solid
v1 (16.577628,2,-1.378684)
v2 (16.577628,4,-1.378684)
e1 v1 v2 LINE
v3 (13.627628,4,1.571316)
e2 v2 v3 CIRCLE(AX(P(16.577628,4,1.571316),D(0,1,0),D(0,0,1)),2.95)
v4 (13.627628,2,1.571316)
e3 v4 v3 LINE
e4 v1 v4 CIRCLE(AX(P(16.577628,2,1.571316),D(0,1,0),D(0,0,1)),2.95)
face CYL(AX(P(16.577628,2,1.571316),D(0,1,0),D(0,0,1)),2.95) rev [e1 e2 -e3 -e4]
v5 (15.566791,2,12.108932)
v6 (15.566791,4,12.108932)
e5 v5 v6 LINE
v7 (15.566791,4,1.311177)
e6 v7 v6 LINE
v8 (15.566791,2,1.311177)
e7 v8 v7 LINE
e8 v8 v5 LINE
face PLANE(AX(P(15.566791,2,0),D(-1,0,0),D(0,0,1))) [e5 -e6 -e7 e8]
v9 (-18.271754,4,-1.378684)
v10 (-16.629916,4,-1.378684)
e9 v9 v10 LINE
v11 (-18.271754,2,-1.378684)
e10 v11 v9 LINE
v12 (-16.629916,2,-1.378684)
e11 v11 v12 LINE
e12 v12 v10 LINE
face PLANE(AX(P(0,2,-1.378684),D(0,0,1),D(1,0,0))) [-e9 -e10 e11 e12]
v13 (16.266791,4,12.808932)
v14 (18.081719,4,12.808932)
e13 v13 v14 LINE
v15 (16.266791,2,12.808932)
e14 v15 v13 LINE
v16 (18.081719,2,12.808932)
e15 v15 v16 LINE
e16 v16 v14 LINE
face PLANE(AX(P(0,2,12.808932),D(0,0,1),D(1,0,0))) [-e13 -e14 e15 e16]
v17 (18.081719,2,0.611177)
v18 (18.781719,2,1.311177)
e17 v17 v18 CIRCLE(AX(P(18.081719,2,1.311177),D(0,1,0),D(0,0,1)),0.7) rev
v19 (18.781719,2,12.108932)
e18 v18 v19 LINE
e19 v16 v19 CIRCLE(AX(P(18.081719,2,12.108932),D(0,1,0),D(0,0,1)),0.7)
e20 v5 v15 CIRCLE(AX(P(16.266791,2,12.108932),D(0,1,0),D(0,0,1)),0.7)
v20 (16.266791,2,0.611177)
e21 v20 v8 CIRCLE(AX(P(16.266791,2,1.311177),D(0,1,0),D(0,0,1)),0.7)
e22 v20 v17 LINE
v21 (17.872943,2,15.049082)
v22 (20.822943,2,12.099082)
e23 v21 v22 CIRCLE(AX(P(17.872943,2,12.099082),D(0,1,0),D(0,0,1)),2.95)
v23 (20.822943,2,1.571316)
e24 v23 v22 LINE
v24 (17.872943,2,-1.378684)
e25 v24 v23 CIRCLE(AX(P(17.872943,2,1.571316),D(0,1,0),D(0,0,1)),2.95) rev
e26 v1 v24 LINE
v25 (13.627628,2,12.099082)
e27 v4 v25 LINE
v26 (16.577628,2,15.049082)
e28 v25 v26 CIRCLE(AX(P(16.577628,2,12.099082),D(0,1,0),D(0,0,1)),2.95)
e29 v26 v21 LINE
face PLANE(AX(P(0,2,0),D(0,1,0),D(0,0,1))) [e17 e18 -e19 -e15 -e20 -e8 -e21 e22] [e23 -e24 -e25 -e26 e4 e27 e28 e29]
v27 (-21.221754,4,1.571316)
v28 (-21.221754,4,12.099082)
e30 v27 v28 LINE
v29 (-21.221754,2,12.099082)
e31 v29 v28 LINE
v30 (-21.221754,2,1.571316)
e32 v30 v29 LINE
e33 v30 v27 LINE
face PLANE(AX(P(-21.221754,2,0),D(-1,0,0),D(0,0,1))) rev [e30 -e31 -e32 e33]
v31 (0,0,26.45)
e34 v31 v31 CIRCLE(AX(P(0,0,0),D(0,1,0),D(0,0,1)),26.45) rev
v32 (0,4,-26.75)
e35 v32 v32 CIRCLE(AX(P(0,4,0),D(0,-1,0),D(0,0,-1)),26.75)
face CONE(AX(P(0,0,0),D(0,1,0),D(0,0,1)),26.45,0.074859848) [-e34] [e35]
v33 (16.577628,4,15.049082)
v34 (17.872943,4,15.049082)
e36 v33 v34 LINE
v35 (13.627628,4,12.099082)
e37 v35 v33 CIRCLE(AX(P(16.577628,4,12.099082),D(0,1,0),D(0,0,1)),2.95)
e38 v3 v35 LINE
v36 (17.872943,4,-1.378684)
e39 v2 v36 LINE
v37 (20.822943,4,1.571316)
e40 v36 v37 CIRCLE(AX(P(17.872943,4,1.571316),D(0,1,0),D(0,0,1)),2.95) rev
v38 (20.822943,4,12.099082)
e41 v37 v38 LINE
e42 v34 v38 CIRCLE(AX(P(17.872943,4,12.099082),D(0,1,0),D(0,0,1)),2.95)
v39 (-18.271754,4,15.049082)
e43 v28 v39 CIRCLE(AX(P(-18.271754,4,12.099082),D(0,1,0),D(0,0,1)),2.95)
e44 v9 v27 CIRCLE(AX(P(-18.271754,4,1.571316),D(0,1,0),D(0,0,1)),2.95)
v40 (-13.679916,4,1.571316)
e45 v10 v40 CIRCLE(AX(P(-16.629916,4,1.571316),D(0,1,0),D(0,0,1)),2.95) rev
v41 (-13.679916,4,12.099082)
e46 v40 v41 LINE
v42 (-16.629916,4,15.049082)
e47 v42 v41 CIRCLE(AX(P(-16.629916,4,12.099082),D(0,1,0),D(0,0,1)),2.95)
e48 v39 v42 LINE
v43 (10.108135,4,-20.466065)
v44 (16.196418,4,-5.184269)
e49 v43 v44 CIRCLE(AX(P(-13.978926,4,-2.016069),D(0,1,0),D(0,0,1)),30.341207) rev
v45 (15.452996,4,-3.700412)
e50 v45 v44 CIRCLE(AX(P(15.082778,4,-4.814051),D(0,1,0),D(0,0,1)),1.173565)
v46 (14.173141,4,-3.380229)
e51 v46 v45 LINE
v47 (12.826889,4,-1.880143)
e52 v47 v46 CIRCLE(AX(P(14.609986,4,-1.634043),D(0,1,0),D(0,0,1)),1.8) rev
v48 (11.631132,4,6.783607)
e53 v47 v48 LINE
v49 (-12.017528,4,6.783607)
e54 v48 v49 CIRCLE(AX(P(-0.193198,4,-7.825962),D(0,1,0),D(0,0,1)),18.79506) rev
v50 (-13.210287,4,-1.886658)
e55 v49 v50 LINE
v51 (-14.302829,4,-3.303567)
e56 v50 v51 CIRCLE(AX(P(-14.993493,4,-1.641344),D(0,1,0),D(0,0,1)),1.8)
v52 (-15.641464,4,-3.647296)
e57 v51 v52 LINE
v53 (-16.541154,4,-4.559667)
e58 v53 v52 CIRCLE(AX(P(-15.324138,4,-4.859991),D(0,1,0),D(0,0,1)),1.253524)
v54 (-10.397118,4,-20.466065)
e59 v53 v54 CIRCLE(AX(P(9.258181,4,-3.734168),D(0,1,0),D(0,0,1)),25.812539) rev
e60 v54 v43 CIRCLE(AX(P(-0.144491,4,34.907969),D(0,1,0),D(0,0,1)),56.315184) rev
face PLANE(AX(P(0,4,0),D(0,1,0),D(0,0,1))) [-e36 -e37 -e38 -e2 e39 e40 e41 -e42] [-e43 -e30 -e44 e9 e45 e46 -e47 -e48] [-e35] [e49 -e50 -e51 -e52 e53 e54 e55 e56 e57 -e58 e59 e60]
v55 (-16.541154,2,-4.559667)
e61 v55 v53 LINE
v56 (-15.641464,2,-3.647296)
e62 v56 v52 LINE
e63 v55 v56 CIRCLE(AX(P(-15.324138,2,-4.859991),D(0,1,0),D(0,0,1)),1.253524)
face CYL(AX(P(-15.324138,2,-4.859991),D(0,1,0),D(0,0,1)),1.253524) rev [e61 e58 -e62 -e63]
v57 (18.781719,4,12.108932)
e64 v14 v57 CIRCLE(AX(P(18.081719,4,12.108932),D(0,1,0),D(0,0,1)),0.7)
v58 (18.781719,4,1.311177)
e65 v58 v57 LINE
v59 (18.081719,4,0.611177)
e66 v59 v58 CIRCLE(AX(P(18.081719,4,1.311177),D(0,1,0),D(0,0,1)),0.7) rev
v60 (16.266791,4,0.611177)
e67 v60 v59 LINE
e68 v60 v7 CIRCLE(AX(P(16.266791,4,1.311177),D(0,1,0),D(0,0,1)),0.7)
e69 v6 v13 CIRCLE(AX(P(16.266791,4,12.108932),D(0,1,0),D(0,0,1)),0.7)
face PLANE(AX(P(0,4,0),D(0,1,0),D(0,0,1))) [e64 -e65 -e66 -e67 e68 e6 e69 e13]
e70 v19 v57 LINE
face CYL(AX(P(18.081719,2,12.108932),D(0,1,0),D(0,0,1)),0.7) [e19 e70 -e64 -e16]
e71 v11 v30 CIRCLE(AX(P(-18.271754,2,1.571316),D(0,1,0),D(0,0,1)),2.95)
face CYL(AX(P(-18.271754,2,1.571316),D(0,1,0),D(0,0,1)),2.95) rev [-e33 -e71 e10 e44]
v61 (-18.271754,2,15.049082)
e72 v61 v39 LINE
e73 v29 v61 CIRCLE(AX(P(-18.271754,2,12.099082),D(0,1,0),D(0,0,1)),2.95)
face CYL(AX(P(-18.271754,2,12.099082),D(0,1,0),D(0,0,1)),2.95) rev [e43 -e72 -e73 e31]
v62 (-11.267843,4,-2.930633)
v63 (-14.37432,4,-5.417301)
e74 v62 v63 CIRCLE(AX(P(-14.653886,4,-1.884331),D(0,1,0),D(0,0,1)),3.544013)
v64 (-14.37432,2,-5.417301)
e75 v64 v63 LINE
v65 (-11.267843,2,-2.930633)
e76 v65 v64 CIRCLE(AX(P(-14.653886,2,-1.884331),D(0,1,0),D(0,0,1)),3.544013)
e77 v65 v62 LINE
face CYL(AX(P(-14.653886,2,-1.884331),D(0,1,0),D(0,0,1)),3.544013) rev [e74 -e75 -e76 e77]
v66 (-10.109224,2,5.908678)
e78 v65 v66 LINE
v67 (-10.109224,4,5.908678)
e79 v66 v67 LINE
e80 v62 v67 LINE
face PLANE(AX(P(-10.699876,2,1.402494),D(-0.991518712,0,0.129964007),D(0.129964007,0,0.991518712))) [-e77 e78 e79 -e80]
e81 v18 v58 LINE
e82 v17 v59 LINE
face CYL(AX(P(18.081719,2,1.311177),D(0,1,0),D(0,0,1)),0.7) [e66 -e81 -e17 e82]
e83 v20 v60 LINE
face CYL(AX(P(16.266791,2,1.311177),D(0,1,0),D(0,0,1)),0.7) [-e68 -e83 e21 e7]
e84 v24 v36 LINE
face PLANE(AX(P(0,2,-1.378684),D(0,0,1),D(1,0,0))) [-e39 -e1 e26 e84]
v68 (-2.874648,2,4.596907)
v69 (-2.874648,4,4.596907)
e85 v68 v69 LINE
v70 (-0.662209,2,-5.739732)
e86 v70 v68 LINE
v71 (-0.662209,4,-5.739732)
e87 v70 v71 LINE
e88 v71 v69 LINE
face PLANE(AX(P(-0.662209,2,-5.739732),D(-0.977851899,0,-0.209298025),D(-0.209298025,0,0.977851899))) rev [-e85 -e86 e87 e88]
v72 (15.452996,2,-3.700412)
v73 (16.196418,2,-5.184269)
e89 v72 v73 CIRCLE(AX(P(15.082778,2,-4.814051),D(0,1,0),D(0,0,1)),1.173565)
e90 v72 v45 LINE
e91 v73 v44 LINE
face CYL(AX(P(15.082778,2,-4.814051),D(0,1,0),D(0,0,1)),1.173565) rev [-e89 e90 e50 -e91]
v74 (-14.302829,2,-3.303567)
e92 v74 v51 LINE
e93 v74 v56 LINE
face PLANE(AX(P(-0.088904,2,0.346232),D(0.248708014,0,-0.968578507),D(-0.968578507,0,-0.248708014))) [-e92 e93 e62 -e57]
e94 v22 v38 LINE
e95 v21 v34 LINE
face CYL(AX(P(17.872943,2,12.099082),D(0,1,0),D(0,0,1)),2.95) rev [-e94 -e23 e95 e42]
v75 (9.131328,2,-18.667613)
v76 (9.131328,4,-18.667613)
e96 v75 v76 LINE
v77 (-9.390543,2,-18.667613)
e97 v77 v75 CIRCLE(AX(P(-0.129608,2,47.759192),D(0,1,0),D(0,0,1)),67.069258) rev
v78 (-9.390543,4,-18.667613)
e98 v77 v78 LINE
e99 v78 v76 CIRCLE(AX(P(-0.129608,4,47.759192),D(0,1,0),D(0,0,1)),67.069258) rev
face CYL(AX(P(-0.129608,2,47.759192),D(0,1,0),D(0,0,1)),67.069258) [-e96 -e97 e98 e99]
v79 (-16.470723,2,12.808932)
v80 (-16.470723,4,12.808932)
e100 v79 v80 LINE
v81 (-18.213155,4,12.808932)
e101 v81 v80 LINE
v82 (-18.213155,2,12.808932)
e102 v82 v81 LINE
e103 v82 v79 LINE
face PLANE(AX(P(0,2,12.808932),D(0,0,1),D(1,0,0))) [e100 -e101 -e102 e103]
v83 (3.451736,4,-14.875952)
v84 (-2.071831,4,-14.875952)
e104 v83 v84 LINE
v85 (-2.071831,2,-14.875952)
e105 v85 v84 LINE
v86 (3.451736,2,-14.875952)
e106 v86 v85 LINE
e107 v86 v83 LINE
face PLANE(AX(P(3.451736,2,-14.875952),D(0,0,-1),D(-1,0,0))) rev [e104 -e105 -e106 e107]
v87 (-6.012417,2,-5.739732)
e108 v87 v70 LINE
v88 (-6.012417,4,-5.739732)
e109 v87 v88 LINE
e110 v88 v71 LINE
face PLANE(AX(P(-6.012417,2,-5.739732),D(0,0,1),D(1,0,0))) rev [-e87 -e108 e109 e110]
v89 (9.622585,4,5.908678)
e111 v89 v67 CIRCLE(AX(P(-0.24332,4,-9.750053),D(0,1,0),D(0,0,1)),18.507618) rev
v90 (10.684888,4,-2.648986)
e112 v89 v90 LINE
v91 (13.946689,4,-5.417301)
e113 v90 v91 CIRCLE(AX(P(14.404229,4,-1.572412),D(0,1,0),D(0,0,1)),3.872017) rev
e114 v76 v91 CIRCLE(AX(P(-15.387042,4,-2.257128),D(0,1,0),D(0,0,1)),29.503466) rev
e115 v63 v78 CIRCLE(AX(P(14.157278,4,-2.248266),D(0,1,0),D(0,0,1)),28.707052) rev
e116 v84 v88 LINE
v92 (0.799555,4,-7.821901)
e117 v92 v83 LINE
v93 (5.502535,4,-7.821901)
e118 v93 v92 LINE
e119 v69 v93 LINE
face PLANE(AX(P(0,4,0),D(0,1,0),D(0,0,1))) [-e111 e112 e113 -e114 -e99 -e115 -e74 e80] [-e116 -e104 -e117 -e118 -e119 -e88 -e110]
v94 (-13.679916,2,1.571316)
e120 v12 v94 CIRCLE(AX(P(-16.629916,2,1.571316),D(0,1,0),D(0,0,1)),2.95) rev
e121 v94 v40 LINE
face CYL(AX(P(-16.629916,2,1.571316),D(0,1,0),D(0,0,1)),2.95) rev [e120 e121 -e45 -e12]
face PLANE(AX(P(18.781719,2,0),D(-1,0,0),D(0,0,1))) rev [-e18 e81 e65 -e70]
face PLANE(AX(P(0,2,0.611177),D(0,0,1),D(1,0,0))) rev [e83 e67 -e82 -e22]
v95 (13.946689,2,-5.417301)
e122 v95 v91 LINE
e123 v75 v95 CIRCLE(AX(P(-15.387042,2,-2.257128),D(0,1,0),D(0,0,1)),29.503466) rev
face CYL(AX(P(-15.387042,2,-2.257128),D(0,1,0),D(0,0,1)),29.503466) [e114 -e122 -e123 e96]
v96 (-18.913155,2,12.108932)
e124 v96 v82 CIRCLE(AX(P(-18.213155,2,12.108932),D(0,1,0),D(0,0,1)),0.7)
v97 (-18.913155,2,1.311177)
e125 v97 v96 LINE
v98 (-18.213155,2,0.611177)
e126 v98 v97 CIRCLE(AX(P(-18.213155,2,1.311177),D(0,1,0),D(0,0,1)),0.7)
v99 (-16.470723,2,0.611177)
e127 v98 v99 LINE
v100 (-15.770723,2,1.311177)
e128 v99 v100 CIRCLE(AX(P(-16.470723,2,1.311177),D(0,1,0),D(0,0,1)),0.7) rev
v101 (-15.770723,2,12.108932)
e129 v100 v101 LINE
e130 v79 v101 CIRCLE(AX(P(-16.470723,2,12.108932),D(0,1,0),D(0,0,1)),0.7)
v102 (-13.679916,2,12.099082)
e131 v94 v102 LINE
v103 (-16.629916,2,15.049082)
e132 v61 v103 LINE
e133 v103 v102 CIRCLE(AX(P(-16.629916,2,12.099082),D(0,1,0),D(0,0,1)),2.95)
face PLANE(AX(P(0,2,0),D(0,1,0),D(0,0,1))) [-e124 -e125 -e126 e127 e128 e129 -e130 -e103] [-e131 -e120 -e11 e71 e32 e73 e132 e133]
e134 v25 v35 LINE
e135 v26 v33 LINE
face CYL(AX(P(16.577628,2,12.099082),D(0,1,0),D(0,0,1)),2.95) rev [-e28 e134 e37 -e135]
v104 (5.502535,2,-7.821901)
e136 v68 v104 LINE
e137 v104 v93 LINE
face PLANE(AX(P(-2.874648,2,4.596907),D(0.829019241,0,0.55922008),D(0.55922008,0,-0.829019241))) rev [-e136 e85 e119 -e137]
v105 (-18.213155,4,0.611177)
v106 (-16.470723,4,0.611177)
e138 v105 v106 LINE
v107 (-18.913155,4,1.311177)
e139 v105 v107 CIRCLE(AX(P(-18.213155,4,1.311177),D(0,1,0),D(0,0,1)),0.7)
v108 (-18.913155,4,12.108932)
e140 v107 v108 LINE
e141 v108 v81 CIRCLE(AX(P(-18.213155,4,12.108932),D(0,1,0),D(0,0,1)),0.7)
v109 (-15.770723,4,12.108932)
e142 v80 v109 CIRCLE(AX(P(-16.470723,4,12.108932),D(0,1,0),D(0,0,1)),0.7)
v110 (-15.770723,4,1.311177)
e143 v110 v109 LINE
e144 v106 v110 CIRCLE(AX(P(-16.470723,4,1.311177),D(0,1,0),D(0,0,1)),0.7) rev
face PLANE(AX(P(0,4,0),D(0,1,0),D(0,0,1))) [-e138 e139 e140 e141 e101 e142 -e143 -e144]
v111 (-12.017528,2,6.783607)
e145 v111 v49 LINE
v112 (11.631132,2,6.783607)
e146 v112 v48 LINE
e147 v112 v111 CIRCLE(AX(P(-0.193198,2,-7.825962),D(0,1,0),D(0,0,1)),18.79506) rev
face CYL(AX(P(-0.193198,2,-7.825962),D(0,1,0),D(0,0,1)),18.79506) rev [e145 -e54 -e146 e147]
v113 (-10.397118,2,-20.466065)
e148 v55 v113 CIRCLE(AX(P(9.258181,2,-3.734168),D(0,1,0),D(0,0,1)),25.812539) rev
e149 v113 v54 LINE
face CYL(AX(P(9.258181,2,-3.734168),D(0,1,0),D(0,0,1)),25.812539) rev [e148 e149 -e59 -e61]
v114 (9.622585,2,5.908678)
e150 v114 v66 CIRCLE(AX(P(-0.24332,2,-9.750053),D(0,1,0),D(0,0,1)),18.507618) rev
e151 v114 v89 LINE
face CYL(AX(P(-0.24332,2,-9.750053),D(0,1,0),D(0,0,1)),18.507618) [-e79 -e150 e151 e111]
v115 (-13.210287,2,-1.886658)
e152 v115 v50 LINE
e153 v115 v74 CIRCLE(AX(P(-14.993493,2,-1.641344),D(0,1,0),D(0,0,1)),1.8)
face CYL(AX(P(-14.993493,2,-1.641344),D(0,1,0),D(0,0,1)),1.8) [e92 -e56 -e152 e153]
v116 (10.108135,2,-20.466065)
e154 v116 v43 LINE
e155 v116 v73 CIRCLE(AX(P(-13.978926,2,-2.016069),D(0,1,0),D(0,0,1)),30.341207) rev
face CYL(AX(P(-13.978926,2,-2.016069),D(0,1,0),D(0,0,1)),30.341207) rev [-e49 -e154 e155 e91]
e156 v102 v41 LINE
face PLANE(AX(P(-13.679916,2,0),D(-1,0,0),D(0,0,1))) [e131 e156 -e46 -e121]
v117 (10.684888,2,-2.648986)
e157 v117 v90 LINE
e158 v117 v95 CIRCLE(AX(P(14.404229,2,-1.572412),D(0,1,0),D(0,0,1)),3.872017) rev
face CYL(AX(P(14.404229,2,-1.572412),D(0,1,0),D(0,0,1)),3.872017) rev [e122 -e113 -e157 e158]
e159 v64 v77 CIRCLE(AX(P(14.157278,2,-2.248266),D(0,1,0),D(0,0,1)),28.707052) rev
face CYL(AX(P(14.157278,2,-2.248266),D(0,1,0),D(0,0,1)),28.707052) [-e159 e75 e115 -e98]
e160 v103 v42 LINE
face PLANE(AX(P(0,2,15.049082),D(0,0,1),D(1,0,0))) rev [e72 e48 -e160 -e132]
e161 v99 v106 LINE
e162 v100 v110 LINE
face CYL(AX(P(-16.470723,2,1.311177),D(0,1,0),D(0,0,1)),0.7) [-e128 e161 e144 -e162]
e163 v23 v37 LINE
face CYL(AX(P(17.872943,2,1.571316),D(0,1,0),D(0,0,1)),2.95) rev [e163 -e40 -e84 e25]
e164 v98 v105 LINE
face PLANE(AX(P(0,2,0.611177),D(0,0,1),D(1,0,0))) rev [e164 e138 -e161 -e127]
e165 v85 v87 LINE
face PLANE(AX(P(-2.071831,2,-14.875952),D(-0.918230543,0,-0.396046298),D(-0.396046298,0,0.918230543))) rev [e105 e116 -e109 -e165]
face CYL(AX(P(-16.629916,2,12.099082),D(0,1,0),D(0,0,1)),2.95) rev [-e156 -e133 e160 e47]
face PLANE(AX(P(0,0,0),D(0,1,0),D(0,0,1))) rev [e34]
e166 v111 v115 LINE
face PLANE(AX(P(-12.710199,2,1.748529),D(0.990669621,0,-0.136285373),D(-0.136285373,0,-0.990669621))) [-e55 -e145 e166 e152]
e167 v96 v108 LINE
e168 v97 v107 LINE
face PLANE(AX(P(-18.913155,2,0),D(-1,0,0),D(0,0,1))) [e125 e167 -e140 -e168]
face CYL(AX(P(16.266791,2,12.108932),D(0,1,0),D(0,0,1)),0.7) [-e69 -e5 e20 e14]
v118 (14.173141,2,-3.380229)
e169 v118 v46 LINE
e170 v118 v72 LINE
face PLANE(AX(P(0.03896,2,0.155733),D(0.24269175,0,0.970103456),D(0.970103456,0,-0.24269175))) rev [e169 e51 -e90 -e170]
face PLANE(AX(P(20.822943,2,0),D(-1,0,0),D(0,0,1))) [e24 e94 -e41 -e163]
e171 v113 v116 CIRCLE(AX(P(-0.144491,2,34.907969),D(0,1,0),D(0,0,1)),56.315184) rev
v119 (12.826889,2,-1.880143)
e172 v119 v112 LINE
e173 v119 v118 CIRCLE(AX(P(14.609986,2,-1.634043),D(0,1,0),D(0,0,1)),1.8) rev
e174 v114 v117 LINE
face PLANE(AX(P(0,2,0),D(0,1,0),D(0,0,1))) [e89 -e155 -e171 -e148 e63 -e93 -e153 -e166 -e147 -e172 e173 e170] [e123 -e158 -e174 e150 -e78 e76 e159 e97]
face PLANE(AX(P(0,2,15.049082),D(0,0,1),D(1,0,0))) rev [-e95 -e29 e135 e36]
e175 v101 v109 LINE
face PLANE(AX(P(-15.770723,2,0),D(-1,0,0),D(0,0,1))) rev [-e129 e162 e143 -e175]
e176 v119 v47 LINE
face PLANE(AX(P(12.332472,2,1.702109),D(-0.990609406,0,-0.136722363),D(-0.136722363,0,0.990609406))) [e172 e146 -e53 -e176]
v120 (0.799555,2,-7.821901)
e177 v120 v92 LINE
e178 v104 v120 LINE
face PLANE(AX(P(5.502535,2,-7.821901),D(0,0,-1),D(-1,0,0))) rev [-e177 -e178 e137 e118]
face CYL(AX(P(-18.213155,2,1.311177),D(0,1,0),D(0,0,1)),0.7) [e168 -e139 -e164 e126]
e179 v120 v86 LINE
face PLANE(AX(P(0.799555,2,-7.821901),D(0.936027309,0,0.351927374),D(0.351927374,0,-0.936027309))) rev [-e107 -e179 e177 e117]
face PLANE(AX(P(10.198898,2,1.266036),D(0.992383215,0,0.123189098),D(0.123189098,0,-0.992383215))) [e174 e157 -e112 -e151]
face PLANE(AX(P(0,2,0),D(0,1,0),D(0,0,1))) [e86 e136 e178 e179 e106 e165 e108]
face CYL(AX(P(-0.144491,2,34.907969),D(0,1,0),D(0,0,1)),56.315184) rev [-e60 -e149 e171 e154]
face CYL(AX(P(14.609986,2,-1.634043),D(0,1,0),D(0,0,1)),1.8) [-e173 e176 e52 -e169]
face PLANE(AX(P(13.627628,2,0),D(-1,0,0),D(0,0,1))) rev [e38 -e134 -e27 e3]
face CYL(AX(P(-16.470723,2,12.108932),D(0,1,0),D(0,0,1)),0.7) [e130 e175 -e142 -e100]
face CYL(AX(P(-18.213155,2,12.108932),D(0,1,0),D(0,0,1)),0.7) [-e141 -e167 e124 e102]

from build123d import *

# Parameters (mm, degrees)
CROQUIS1_R              = 26.25
SALIENTE_EXTRUIR1_DEPTH = 4
CORTAR_EXTRUIR2_DEPTH   = 2
CROQUIS3_R              = 26.75
CROQUIS3_R_2            = 26.25
SALIENTE_EXTRUIR2_DEPTH = 4
CHAFL_N2_SIZE           = 0.3
CHAFL_N2_SIZE_2         = 4


with BuildPart() as part:
    # Croquis1 → Saliente-Extruir1 (new body)
    with BuildSketch(Plane(origin=(0, 0, 0), x_dir=(1, 0, 0), z_dir=(0, 1, 0))):
        with Locations(Location((0, 0, 0), (0, 0, 270))):
            Circle(CROQUIS1_R)
    extrude(amount=SALIENTE_EXTRUIR1_DEPTH)

    # Croquis2 → Cortar-Extruir2 (cut)
    # profile 1 of 4: a face of its own
    with BuildSketch(Plane(origin=(0, 4, 0), x_dir=(1, 0, 0), z_dir=(0, 1, 0))):
        with BuildLine():
            Line((16.577628019, 1.378684251), (17.872942997, 1.378684251))
            ThreePointArc((17.872942997, 1.378684251), (19.958908001, 0.514649256), (20.822942997, -1.571315749))
            Line((20.822942997, -1.571315749), (20.822942997, -12.099082076))
            ThreePointArc((20.822942997, -12.099082076), (19.958908001, -14.18504708), (17.872942997, -15.049082076))
            Line((17.872942997, -15.049082076), (16.577628019, -15.049082076))
            ThreePointArc((16.577628019, -15.049082076), (14.491663014, -14.18504708), (13.627628019, -12.099082076))
            Line((13.627628019, -12.099082076), (13.627628019, -1.571315749))
            ThreePointArc((13.627628019, -1.571315749), (14.491663014, 0.514649256), (16.577628019, 1.378684251))
        make_face()
        with BuildLine():
            ThreePointArc((16.26679092, -0.611177343), (15.771816174, -0.816202597), (15.56679092, -1.311177343))
            Line((15.56679092, -1.311177343), (15.56679092, -12.108932122))
            ThreePointArc((15.56679092, -12.108932122), (15.771816174, -12.603906869), (16.26679092, -12.808932122))
            Line((16.26679092, -12.808932122), (18.08171889, -12.808932122))
            ThreePointArc((18.08171889, -12.808932122), (18.576693636, -12.603906869), (18.78171889, -12.108932122))
            Line((18.78171889, -12.108932122), (18.78171889, -1.311177343))
            ThreePointArc((18.78171889, -1.311177343), (18.576693636, -0.816202597), (18.08171889, -0.611177343))
            Line((18.08171889, -0.611177343), (16.26679092, -0.611177343))
        make_face(mode=Mode.SUBTRACT)
    # profile 2 of 4: a face of its own
    with BuildSketch(Plane(origin=(0, 4, 0), x_dir=(1, 0, 0), z_dir=(0, 1, 0))):
        with BuildLine():
            ThreePointArc((-16.541154267, 4.559666994), (-14.820529985, 13.034857679), (-10.397118387, 20.466064507))
            ThreePointArc((-10.397118387, 20.466064507), (-0.144491455, 21.407214974), (10.108135477, 20.466064507))
            ThreePointArc((10.108135477, 20.466064507), (14.207692764, 13.245645686), (16.196417943, 5.184269249))
            ThreePointArc((16.196417943, 5.184269249), (16.132024065, 4.288372794), (15.452996259, 3.700411684))
            Line((15.452996259, 3.700411684), (14.173141036, 3.380229026))
            ThreePointArc((14.173141036, 3.380229026), (13.270359302, 2.836290622), (12.826889255, 1.880143059))
            Line((12.826889255, 1.880143059), (11.63113204, -6.78360674))
            ThreePointArc((11.63113204, -6.78360674), (-0.193198097, -10.969098115), (-12.017528234, -6.78360674))
            Line((-12.017528234, -6.78360674), (-13.210287359, 1.886657738))
            ThreePointArc((-13.210287359, 1.886657738), (-13.568040347, 2.740473566), (-14.30282929, 3.303566701))
            Line((-14.30282929, 3.303566701), (-15.641463565, 3.64729627))
            ThreePointArc((-15.641463565, 3.64729627), (-16.21669402, 3.979839116), (-16.541154267, 4.559666994))
        make_face()
        with BuildLine():
            ThreePointArc((-9.39054296, 18.667613115), (-0.129607572, 19.310065951), (9.131327816, 18.667613115))
            ThreePointArc((9.131327816, 18.667613115), (12.342092273, 12.334309576), (13.946689107, 5.417300749))
            ThreePointArc((13.946689107, 5.417300749), (11.898739751, 4.524535831), (10.6848875, 2.648985651))
            Line((10.6848875, 2.648985651), (9.622585247, -5.908678465))
            ThreePointArc((9.622585247, -5.908678465), (-0.243319564, -8.757565726), (-10.109224375, -5.908678465))
            Line((-10.109224375, -5.908678465), (-11.267843272, 2.930632851))
            ThreePointArc((-11.267843272, 2.930632851), (-12.439150787, 4.651094628), (-14.374319564, 5.417300749))
            ThreePointArc((-14.374319564, 5.417300749), (-12.712019595, 12.354486023), (-9.39054296, 18.667613115))
        make_face(mode=Mode.SUBTRACT)
    # profile 3 of 4: a face of its own
    with BuildSketch(Plane(origin=(0, 4, 0), x_dir=(1, 0, 0), z_dir=(0, 1, 0))):
        with BuildLine():
            Line((-21.221754159, -1.571315749), (-21.221754159, -12.099082076))
            ThreePointArc((-21.221754159, -12.099082076), (-20.357719163, -14.18504708), (-18.271754159, -15.049082076))
            Line((-18.271754159, -15.049082076), (-16.629915981, -15.049082076))
            ThreePointArc((-16.629915981, -15.049082076), (-14.543950977, -14.18504708), (-13.679915981, -12.099082076))
            Line((-13.679915981, -12.099082076), (-13.679915981, -1.571315749))
            ThreePointArc((-13.679915981, -1.571315749), (-14.543950977, 0.514649256), (-16.629915981, 1.378684251))
            Line((-16.629915981, 1.378684251), (-18.271754159, 1.378684251))
            ThreePointArc((-18.271754159, 1.378684251), (-20.357719163, 0.514649256), (-21.221754159, -1.571315749))
        make_face()
        with BuildLine():
            ThreePointArc((-16.470722605, -12.808932122), (-15.975747858, -12.603906869), (-15.770722605, -12.108932122))
            Line((-15.770722605, -12.108932122), (-15.770722605, -1.311177343))
            ThreePointArc((-15.770722605, -1.311177343), (-15.975747858, -0.816202597), (-16.470722605, -0.611177343))
            Line((-16.470722605, -0.611177343), (-18.213155179, -0.611177343))
            ThreePointArc((-18.213155179, -0.611177343), (-18.708129925, -0.816202597), (-18.913155179, -1.311177343))
            Line((-18.913155179, -1.311177343), (-18.913155179, -12.108932122))
            ThreePointArc((-18.913155179, -12.108932122), (-18.708129925, -12.603906869), (-18.213155179, -12.808932122))
            Line((-18.213155179, -12.808932122), (-16.470722605, -12.808932122))
        make_face(mode=Mode.SUBTRACT)
    # profile 4 of 4: a face of its own
    with BuildSketch(Plane(origin=(0, 4, 0), x_dir=(1, 0, 0), z_dir=(0, 1, 0))):
        Polygon((5.502535459, 7.821900935), (0.799555116, 7.821900935), (3.451735919, 14.875951975), (-2.071830813, 14.875951975), (-6.012416606, 5.739731652), (-0.66220899, 5.739731652), (-2.874648277, -4.596906534), align=None)
    extrude(amount=-CORTAR_EXTRUIR2_DEPTH, mode=Mode.SUBTRACT)

    # Croquis3 → Saliente-Extruir2 (add)
    with BuildSketch(Plane.XZ):
        with Locations(Location((0, 0, 0), (0, 0, 270))):
            Circle(CROQUIS3_R)
        Circle(CROQUIS3_R_2, mode=Mode.SUBTRACT)
    extrude(amount=-SALIENTE_EXTRUIR2_DEPTH)

    # Chaflán2
    # the kernel refuses this chamfer: 4, 0.3 mm, written as the material it takes off along each edge
    with BuildSketch(Plane(origin=(0, 0, 0), x_dir=(0, 0, -1), z_dir=(-1, 0, 0))) as chafl_n2_piece_1:
        Polygon((26.75 - CHAFL_N2_SIZE, 0), (26.75, -CHAFL_N2_SIZE_2), (26.75, 0), align=None)
    revolve(axis=Axis((0, 0, 0), (0, -1, 0)), mode=Mode.SUBTRACT)


solid = part.part
